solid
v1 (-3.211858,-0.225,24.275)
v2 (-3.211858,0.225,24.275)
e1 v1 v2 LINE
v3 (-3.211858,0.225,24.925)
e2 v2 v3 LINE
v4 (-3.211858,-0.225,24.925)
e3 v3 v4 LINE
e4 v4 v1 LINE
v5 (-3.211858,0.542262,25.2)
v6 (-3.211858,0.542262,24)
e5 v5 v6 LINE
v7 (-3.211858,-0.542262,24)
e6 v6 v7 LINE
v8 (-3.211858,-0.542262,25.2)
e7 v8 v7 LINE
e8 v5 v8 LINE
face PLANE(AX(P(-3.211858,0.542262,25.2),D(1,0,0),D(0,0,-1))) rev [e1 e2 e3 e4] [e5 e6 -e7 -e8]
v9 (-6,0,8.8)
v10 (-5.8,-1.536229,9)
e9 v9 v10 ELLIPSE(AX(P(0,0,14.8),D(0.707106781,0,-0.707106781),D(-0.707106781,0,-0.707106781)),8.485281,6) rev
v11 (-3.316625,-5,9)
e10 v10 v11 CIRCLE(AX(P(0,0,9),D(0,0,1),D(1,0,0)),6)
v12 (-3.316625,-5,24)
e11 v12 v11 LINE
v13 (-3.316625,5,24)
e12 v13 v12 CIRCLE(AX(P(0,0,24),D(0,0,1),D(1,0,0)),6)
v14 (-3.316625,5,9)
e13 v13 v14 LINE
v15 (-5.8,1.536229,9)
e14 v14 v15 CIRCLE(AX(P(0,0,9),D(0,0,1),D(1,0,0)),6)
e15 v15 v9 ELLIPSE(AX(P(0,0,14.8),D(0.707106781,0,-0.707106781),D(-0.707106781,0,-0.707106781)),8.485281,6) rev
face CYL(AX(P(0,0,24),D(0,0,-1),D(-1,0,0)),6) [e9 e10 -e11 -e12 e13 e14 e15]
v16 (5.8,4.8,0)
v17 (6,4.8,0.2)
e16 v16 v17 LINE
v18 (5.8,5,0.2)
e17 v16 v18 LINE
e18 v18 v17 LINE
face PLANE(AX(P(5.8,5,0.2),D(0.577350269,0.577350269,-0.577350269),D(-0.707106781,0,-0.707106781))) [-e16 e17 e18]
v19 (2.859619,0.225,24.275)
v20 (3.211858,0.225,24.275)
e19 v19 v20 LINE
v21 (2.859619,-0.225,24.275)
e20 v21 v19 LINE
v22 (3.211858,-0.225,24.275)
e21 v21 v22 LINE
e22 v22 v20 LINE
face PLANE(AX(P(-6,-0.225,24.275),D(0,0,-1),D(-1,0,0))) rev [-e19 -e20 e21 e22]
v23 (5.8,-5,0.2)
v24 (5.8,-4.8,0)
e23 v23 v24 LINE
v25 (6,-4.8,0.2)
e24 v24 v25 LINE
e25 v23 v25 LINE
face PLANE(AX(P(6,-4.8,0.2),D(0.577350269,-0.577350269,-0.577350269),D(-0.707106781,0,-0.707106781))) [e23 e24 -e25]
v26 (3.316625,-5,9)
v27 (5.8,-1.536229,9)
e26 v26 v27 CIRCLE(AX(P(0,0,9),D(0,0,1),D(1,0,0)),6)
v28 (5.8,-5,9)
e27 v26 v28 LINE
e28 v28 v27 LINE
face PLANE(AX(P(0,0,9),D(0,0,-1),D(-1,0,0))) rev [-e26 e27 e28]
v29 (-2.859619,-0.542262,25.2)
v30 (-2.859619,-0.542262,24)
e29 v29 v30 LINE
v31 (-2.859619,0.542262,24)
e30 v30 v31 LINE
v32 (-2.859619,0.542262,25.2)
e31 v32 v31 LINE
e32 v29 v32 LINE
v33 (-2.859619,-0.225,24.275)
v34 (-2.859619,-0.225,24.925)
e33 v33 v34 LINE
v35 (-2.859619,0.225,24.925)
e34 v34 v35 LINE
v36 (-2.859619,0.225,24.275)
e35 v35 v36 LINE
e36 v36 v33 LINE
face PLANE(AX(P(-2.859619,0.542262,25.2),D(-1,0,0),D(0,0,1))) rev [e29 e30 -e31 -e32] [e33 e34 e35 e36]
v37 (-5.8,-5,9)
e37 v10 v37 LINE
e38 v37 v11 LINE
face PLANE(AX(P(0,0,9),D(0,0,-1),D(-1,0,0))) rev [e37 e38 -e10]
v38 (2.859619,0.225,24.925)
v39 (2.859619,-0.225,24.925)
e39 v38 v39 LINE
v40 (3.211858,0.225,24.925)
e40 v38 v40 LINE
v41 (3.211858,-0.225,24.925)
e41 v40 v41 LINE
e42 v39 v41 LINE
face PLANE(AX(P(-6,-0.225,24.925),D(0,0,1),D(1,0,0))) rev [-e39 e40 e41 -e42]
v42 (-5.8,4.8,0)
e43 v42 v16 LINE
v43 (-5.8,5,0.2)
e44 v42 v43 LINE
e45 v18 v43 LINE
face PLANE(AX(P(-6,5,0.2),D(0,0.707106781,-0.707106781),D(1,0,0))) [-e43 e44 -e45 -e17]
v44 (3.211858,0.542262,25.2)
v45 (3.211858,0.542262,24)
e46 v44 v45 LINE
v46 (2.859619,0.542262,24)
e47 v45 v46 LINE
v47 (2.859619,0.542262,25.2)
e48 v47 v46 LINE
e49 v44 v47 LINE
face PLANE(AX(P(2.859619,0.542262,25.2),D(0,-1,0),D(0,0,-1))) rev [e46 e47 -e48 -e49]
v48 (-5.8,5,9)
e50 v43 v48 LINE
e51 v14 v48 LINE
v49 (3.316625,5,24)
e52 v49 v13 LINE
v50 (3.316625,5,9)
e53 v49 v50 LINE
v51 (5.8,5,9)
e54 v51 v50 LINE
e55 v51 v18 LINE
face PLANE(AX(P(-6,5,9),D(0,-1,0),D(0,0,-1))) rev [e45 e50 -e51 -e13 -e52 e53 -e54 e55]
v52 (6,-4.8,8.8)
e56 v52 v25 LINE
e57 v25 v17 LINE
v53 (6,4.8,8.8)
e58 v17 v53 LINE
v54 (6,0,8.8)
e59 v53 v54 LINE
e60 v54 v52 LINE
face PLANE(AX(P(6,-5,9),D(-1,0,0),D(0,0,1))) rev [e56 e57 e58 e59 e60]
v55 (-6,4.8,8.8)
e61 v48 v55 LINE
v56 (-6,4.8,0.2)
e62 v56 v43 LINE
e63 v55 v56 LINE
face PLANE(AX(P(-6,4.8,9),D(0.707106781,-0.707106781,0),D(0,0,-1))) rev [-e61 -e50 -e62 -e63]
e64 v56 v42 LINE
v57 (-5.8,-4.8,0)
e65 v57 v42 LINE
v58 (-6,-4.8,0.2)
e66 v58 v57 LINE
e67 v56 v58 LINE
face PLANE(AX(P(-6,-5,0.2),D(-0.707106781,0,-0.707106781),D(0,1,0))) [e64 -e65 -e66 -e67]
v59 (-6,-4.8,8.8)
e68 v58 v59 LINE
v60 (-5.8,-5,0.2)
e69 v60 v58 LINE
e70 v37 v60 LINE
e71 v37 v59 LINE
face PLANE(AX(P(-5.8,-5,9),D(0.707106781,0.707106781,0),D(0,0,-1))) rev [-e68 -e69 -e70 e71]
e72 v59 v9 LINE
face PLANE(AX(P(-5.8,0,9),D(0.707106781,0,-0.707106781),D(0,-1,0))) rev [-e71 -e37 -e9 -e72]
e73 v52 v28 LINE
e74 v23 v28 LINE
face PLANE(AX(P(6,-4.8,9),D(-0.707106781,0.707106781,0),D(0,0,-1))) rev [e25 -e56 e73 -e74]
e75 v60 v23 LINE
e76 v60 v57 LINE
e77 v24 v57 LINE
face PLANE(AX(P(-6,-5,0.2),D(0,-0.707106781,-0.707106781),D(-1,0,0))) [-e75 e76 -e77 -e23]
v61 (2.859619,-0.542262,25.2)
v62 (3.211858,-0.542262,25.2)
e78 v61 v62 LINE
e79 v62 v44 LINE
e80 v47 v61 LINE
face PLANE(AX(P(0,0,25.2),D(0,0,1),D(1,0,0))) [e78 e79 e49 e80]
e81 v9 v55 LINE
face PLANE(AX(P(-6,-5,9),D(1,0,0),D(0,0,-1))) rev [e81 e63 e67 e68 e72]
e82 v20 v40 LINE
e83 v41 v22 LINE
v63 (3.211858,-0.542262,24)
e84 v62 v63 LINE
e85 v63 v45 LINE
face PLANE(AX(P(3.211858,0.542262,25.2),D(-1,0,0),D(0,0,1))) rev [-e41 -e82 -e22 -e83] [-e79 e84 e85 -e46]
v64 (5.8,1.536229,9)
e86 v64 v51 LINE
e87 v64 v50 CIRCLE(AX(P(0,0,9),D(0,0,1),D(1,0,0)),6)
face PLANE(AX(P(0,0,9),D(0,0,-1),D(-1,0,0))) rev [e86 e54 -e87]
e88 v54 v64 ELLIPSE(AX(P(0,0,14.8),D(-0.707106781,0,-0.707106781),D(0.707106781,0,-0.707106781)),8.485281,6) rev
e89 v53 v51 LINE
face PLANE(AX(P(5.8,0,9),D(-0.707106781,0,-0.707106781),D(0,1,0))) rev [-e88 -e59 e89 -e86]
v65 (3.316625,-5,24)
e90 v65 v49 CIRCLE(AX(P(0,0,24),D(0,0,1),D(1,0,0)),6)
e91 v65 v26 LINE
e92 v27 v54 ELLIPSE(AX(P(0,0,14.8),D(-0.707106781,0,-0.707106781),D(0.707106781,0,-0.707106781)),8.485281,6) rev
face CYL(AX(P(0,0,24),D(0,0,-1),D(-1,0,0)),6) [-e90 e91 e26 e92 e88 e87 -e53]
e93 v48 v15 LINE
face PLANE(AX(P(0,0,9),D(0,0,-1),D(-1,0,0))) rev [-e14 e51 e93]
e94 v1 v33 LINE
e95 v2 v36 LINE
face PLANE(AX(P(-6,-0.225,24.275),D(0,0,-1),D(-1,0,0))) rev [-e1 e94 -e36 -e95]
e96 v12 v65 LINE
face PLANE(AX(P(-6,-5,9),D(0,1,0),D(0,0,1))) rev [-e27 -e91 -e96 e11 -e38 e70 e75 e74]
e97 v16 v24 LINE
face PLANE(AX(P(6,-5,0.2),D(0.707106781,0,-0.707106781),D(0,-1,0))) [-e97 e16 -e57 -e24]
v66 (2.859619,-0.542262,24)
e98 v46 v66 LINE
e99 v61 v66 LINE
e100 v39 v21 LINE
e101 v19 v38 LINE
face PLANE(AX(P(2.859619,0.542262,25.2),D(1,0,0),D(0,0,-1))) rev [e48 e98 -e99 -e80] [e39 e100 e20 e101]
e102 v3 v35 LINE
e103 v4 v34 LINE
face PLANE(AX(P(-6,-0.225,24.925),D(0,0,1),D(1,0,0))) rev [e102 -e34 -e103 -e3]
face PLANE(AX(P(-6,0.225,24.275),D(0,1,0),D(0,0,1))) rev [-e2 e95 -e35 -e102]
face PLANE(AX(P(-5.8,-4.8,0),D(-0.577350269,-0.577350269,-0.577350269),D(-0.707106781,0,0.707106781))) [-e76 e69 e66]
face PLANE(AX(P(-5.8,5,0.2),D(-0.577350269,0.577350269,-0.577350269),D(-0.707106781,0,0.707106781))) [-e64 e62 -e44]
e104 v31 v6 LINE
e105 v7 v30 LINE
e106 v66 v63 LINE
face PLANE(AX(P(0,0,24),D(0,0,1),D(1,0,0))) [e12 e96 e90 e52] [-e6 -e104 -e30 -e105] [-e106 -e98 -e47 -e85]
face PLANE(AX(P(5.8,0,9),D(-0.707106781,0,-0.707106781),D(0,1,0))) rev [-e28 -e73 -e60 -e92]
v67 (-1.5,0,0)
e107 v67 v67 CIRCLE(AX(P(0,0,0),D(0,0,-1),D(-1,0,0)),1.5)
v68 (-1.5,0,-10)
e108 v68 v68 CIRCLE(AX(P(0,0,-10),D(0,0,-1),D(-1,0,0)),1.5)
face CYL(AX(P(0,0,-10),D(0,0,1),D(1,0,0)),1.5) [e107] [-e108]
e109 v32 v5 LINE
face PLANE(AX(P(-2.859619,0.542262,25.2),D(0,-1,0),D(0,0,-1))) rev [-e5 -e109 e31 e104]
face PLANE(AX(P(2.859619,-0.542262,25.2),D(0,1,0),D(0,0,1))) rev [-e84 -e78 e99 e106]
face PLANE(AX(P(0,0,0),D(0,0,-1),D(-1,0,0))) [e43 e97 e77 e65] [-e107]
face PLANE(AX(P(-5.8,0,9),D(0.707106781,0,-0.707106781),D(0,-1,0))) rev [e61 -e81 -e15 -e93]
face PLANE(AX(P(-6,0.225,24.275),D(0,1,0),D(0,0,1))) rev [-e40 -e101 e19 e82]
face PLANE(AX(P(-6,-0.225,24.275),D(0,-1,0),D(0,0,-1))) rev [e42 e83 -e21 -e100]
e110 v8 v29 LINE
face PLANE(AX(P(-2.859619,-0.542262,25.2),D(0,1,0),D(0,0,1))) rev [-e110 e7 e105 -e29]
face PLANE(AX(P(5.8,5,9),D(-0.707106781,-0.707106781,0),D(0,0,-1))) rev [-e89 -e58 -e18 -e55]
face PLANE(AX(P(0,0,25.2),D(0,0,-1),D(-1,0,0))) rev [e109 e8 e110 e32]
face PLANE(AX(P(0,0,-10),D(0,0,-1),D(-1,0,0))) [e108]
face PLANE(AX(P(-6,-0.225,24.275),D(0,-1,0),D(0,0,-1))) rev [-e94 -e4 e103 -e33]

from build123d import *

# Parameters (mm, degrees)
SKETCH_1_W          = 12
SKETCH_1_H          = 10
EXTRUDE_2_DEPTH     = 9
EXTRUDE_4_DEPTH     = 15
CHAMFER_4_SIZE      = 0.2
SKETCH_4_W          = 0.352238381
SKETCH_4_H          = 1.084523436
EXTRUDE_5_DEPTH     = 1.2
SKETCH_5_W          = 0.65
SKETCH_5_H          = 0.45
CUT_EXTRUDE_1_DEPTH = 28.29282553
SKETCH_6_R          = 1.5
EXTRUDE_6_DEPTH     = 10


with BuildPart() as part:
    # 草图1 → 凸台-拉伸2 (new body)
    with BuildSketch(Plane.XY):
        Rectangle(SKETCH_1_W, SKETCH_1_H)
    extrude(amount=EXTRUDE_2_DEPTH)

    # 草图2 → 凸台-拉伸4 (add)
    with BuildSketch(Plane.XY.offset(9)):
        with BuildLine():
            Line((-3.31662479, 5), (3.31662479, 5))
            ThreePointArc((3.31662479, 5), (6, 0), (3.31662479, -5))
            Line((3.31662479, -5), (-3.31662479, -5))
            ThreePointArc((-3.31662479, -5), (-6, 0), (-3.31662479, 5))
        make_face()
    extrude(amount=EXTRUDE_4_DEPTH)

    # 倒角4
    # the kernel refuses this chamfer: 0.2 mm, written as the material it takes off along each edge
    with BuildSketch(Plane(origin=(-5.866666667, -4.866666667, 0.133333333), x_dir=(-0.7071067811865491, 0.707106781186546, 0), z_dir=(-0.577350269189624, -0.5773502691896265, -0.5773502691896268)), Plane(origin=(5.866666667, 4.866666667, 0.133333333), x_dir=(-0.7071067811865478, -3.1401849173675483e-15, -0.7071067811865472), z_dir=(0.577350269189624, 0.5773502691896265, -0.577350269189627))) as chamfer_4_piece_1:
        Polygon((-0.141421356, -0.081649658), (0.141421356, -0.081649658), (0, 0.163299316), align=None)
    extrude(amount=0.254034118, mode=Mode.SUBTRACT)
    with BuildSketch(Plane(origin=(5.866666667, -4.866666667, 0.133333333), x_dir=(0.707106781186546, 0.7071067811865491, 0), z_dir=(0.5773502691896265, -0.577350269189624, -0.577350269189627)), Plane(origin=(-5.866666667, 4.866666667, 0.133333333), x_dir=(0.7071067811865478, 0, -0.7071067811865472), z_dir=(-0.5773502691896265, 0.577350269189624, -0.5773502691896268))) as chamfer_4_piece_2:
        Polygon((-0.141421356, 0.081649658), (0.141421356, 0.081649658), (0, -0.163299316), align=None)
    extrude(amount=0.254034118, mode=Mode.SUBTRACT)
    with BuildSketch(Plane(origin=(-6, 5.514336598, 9), x_dir=(-0.02749587661058742, 0, -0.9996219169112966), z_dir=(0, -1, 0))) as chamfer_4_piece_3_section:
        Polygon((CHAMFER_4_SIZE * 0.999621916911, CHAMFER_4_SIZE * 0.0274958766106), (-CHAMFER_4_SIZE * 0.0274958766106, CHAMFER_4_SIZE * 0.999621916911), (0, 0), align=None)
    chamfer_4_piece_3 = extrude(amount=5.514336598, mode=Mode.PRIVATE)
    chamfer_4_piece_3 = chamfer_4_piece_3 - Plane(origin=(0, 0, 8.93146509), x_dir=(-0.5527707983925667, -0.8333333333333334, 0), z_dir=(0, 0, -1)) * Cylinder(6, 12, mode=Mode.PRIVATE)
    add(chamfer_4_piece_3, mode=Mode.SUBTRACT)
    with BuildSketch(Plane(origin=(6, 0, 9), x_dir=(0.02749587661058742, 0, -0.9996219169112966), z_dir=(0, 1, 0))) as chamfer_4_piece_4_section:
        Polygon((CHAMFER_4_SIZE * 0.999621916911, CHAMFER_4_SIZE * 0.0274958766106), (-CHAMFER_4_SIZE * 0.0274958766106, CHAMFER_4_SIZE * 0.999621916911), (0, 0), align=None)
    chamfer_4_piece_4 = extrude(amount=5.514336598, mode=Mode.PRIVATE)
    chamfer_4_piece_4 = chamfer_4_piece_4 - Plane(origin=(0, 0, 8.931465093), x_dir=(0.5527707983925666, 0.8333333333333334, 0), z_dir=(0, 0, -1)) * Cylinder(6, 12, mode=Mode.PRIVATE)
    add(chamfer_4_piece_4, mode=Mode.SUBTRACT)
    with BuildSketch(Plane(origin=(-6, 0, 9), x_dir=(-0.02749587661058742, 0, -0.9996219169112966), z_dir=(0, -1, 0))) as chamfer_4_piece_5_section:
        Polygon((CHAMFER_4_SIZE * 0.999621916911, CHAMFER_4_SIZE * 0.0274958766106), (-CHAMFER_4_SIZE * 0.0274958766106, CHAMFER_4_SIZE * 0.999621916911), (0, 0), align=None)
    chamfer_4_piece_5 = extrude(amount=5.514336598, mode=Mode.PRIVATE)
    chamfer_4_piece_5 = chamfer_4_piece_5 - Plane(origin=(0, 0, 8.931465093), x_dir=(-0.5527707983925667, -0.8333333333333334, 0), z_dir=(0, 0, -1)) * Cylinder(6, 12, mode=Mode.PRIVATE)
    add(chamfer_4_piece_5, mode=Mode.SUBTRACT)
    with BuildSketch(Plane(origin=(6, -5.514336598, 9), x_dir=(0.02749587661058742, 0, -0.9996219169112966), z_dir=(0, 1, 0))) as chamfer_4_piece_6_section:
        Polygon((CHAMFER_4_SIZE * 0.999621916911, CHAMFER_4_SIZE * 0.0274958766106), (-CHAMFER_4_SIZE * 0.0274958766106, CHAMFER_4_SIZE * 0.999621916911), (0, 0), align=None)
    chamfer_4_piece_6 = extrude(amount=5.514336598, mode=Mode.PRIVATE)
    chamfer_4_piece_6 = chamfer_4_piece_6 - Plane(origin=(0, 0, 8.93146509), x_dir=(0.5527707983925666, 0.8333333333333334, 0), z_dir=(0, 0, -1)) * Cylinder(6, 12, mode=Mode.PRIVATE)
    add(chamfer_4_piece_6, mode=Mode.SUBTRACT)
    with BuildSketch(Plane(origin=(-6.514336598, -5, 0), x_dir=(0, -0.02749587661058735, 0.9996219169112966), z_dir=(1, 0, 0))) as chamfer_4_piece_7:
        Polygon((CHAMFER_4_SIZE * 0.999621916911, -CHAMFER_4_SIZE * 0.0274958766106), (-CHAMFER_4_SIZE * 0.0274958766106, -CHAMFER_4_SIZE * 0.999621916911), (0, 0), align=None)
    extrude(amount=13.028673195, mode=Mode.SUBTRACT)
    with BuildSketch(Plane(origin=(-6, 5.514336598, 0), x_dir=(-0.02749587661058735, 0, 0.9996219169112966), z_dir=(0, -1, 0)), Plane(origin=(6, -5.514336598, 0), x_dir=(0.02749587661058735, 0, 0.9996219169112966), z_dir=(0, 1, 0))) as chamfer_4_piece_8:
        Polygon((CHAMFER_4_SIZE * 0.999621916911, -CHAMFER_4_SIZE * 0.0274958766106), (-CHAMFER_4_SIZE * 0.0274958766106, -CHAMFER_4_SIZE * 0.999621916911), (0, 0), align=None)
    extrude(amount=11.028673195, mode=Mode.SUBTRACT)
    with BuildSketch(Plane(origin=(6.514336598, 5, 0), x_dir=(0, -0.9996219169112968, -0.027495876610586313), z_dir=(-1, 0, 0))) as chamfer_4_piece_9:
        Polygon((CHAMFER_4_SIZE * 0.999621916911, CHAMFER_4_SIZE * 0.0274958766106), (-CHAMFER_4_SIZE * 0.0274958766106, CHAMFER_4_SIZE * 0.999621916911), (0, 0), align=None)
    extrude(amount=13.028673195, mode=Mode.SUBTRACT)
    with BuildSketch(Plane(origin=(6, -5, -0.514336598), x_dir=(-0.9996219169112966, -0.02749587661058742, 0), z_dir=(0, 0, 1)), Plane(origin=(6, 5, -0.514336598), x_dir=(0.02749587661058742, -0.9996219169112966, 0), z_dir=(0, 0, 1))) as chamfer_4_piece_10:
        Polygon((CHAMFER_4_SIZE * 0.999621916911, -CHAMFER_4_SIZE * 0.0274958766106), (-CHAMFER_4_SIZE * 0.0274958766106, -CHAMFER_4_SIZE * 0.999621916911), (0, 0), align=None)
    extrude(amount=10.028673195, mode=Mode.SUBTRACT)
    with BuildSketch(Plane(origin=(-6, -5, -0.514336598), x_dir=(0.9996219169112966, -0.027495876610587302, 0), z_dir=(0, 0, 1)), Plane(origin=(-6, 5, -0.514336598), x_dir=(-0.027495876610587302, -0.9996219169112966, 0), z_dir=(0, 0, 1))) as chamfer_4_piece_11:
        Polygon((CHAMFER_4_SIZE * 0.999621916911, CHAMFER_4_SIZE * 0.0274958766106), (-CHAMFER_4_SIZE * 0.0274958766106, CHAMFER_4_SIZE * 0.999621916911), (0, 0), align=None)
    extrude(amount=10.028673195, mode=Mode.SUBTRACT)

    # 草图4 → 凸台-拉伸5 (add)
    with BuildSketch(Plane.XY.offset(24)):
        with Locations((-3.035738681, 0)):
            Rectangle(SKETCH_4_W, SKETCH_4_H)
        with Locations((3.035738681, 0)):
            Rectangle(SKETCH_4_W, SKETCH_4_H)
    extrude(amount=EXTRUDE_5_DEPTH)

    # 草图5 → 切除-拉伸1 (cut, through all)
    with BuildSketch(Plane(origin=(3.211857871, 0, 0), x_dir=(0, 0, -1), z_dir=(1, 0, 0))):
        with Locations((-24.6, 0)):
            Rectangle(SKETCH_5_W, SKETCH_5_H)
    extrude(amount=-CUT_EXTRUDE_1_DEPTH, mode=Mode.SUBTRACT)

    # 草图6 → 凸台-拉伸6 (add)
    with BuildSketch(Plane(origin=(0, 0, 0), x_dir=(-1, 0, 0), z_dir=(0, 0, -1))):
        Circle(SKETCH_6_R)
    extrude(amount=EXTRUDE_6_DEPTH)


solid = part.part
